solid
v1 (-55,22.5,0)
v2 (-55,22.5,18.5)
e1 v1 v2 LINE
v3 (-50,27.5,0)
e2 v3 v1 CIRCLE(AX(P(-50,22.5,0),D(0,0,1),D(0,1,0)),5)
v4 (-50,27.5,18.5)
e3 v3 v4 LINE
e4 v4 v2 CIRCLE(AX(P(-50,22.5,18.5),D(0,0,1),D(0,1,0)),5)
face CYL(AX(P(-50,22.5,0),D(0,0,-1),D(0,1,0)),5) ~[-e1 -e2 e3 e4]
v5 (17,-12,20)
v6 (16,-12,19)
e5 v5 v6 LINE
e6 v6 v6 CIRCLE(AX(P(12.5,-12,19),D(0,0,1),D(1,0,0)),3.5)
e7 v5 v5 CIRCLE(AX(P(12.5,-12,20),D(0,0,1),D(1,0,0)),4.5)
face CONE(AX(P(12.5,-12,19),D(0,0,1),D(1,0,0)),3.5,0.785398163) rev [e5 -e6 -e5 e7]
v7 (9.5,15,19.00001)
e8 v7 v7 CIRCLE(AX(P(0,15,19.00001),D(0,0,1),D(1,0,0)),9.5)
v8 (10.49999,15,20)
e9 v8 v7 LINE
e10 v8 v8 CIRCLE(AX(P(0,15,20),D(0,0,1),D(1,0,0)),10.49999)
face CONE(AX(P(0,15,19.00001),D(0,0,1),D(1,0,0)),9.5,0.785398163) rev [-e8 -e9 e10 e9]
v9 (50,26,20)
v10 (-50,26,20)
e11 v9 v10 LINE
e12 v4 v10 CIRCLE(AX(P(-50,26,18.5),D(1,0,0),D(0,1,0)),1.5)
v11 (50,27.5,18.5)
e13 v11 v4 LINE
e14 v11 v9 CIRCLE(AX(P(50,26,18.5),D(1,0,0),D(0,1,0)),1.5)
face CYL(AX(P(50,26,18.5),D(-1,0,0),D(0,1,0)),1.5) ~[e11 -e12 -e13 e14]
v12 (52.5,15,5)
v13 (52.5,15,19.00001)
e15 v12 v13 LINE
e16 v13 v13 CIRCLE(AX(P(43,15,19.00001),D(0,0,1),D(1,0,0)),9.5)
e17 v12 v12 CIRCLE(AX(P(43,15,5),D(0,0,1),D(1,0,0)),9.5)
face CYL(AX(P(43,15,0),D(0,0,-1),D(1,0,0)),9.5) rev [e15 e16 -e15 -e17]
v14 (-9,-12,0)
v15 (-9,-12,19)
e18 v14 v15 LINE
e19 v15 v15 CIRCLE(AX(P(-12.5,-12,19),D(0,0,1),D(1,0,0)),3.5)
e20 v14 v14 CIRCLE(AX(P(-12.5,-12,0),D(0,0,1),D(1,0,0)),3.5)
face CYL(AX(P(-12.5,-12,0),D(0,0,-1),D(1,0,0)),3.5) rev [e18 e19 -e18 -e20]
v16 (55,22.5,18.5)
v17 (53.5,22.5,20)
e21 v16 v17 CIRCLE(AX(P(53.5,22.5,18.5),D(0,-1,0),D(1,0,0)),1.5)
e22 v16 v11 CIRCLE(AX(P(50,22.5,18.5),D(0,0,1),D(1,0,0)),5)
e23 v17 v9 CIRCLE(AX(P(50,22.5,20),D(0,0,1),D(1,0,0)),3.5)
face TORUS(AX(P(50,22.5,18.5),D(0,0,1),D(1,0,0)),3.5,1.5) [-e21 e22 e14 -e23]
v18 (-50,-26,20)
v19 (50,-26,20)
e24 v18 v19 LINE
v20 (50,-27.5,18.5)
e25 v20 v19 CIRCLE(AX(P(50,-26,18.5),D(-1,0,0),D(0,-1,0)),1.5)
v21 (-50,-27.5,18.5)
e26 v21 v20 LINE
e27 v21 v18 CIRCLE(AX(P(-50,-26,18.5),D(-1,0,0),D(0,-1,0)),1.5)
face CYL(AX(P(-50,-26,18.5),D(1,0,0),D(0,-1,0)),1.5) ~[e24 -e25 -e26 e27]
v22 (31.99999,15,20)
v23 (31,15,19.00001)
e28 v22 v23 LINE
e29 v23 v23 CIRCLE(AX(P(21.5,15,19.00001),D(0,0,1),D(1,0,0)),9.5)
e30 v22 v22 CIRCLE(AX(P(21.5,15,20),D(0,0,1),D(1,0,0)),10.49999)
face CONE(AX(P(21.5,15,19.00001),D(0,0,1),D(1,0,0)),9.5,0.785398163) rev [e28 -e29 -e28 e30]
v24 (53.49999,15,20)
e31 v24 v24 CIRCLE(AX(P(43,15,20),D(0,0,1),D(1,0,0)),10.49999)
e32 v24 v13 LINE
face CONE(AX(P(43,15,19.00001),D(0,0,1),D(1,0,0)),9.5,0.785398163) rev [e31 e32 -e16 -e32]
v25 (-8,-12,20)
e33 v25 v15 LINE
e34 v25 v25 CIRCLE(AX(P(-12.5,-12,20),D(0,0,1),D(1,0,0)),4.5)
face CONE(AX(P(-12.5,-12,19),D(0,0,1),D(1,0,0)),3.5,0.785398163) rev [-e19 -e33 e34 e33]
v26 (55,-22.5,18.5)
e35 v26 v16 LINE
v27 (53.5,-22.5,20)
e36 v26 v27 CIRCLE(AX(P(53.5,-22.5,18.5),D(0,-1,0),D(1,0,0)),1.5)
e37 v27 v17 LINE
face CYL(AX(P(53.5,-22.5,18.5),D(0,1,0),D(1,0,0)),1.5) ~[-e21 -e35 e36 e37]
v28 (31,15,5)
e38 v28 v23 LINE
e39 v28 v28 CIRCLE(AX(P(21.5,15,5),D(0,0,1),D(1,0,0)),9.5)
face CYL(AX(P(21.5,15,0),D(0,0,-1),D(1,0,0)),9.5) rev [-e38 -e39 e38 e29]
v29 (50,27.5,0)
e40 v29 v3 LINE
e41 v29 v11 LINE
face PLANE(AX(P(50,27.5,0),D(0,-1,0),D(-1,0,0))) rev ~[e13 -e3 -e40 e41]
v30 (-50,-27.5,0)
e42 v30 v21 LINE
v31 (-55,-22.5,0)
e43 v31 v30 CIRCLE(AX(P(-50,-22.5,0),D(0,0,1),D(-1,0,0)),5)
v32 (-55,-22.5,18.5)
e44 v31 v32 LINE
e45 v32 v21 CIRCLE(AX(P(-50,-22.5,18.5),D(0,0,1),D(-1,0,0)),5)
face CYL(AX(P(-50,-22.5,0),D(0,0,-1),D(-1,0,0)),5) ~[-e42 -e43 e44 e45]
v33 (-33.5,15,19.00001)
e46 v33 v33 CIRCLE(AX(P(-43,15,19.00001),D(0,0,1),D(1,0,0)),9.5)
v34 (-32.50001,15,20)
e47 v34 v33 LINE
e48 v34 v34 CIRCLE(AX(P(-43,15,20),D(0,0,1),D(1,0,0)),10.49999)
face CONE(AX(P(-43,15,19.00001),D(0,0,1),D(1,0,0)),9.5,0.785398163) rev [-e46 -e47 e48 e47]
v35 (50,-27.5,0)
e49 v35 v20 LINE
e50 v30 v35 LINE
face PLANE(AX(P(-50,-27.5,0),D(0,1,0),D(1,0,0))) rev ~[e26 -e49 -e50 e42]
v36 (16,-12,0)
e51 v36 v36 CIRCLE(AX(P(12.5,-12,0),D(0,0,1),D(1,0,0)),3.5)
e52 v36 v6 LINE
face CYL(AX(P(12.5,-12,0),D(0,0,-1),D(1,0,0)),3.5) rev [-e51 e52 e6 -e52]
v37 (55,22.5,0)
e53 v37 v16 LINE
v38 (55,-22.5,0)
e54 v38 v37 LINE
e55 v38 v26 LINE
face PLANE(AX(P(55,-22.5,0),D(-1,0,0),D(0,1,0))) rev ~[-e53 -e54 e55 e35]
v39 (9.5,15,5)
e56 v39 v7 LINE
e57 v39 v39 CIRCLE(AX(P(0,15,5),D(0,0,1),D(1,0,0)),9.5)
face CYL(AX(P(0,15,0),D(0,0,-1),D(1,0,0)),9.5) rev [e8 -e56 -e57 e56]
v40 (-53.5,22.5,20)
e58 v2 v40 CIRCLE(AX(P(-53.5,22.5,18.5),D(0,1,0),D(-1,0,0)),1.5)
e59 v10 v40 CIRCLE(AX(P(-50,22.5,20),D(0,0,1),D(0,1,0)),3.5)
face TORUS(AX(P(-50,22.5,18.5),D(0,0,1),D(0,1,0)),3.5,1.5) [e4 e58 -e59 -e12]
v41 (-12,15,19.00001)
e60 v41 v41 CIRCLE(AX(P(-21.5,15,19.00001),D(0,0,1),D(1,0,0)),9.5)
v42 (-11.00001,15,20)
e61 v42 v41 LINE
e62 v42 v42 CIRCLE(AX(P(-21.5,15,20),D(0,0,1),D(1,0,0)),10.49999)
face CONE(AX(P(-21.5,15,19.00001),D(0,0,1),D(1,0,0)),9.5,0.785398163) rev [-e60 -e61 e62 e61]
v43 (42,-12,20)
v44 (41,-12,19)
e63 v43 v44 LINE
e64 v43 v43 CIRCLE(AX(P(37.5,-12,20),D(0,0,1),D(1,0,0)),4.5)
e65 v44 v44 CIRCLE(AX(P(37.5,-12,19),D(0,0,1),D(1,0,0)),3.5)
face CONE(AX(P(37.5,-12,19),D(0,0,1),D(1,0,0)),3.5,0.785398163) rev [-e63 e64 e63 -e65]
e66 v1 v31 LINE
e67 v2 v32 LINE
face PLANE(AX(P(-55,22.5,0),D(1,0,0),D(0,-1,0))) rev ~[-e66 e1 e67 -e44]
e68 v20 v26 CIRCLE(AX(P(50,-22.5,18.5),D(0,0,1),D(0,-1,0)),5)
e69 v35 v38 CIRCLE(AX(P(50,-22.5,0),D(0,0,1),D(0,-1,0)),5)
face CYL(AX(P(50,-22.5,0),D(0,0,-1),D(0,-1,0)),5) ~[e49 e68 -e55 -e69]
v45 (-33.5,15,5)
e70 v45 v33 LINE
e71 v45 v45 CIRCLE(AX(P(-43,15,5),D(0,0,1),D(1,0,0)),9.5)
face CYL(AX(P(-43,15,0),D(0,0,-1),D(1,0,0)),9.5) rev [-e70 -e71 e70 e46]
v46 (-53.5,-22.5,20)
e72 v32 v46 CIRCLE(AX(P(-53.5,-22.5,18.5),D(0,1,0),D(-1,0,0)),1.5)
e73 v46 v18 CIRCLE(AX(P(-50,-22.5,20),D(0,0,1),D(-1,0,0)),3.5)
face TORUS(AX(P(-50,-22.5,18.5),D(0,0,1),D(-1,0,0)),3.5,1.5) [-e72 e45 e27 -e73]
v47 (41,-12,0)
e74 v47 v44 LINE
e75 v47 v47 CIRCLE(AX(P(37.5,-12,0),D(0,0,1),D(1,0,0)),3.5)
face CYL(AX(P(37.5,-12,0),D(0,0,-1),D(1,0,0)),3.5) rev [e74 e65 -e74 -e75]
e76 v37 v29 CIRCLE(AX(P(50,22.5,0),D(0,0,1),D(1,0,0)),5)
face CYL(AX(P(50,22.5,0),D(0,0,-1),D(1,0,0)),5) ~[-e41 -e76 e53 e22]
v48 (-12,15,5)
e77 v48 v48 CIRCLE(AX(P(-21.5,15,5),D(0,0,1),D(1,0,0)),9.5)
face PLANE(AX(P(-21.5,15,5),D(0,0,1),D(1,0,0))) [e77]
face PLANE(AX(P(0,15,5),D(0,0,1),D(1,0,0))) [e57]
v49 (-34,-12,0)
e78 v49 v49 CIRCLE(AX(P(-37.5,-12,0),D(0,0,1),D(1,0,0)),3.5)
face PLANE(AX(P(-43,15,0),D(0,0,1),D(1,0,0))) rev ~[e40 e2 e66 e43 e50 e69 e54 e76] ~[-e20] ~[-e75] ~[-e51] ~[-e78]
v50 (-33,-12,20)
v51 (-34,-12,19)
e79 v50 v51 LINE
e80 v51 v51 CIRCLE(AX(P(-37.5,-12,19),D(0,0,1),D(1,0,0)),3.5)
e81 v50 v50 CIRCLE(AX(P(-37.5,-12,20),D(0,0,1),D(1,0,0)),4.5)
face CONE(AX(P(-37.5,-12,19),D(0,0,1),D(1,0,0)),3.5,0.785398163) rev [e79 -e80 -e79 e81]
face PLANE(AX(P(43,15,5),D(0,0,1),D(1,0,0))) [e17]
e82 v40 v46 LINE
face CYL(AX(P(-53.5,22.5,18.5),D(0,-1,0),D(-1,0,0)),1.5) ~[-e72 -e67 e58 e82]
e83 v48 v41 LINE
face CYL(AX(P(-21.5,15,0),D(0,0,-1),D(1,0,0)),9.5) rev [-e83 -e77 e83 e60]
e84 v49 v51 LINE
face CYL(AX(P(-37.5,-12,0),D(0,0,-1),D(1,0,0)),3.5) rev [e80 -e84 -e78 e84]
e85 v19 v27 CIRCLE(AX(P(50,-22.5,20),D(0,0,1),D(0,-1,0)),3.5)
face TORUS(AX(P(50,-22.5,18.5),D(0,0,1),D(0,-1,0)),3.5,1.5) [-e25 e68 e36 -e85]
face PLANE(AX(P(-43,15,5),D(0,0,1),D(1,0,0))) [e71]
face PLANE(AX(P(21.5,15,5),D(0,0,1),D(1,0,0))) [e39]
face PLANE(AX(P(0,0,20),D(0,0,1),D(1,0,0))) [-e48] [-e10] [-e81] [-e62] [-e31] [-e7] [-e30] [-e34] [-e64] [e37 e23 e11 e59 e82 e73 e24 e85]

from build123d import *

# Parameters (mm, degrees)
F0_R     = 12.5
F0_R_2   = 9.5
F0_R_3   = 3.5
F1_DEPTH = 20
F2_DEPTH = 5
F3_R     = 1.5
F4_SIZE  = 0.99999
F5_SIZE  = 1


# Not quite as in the source:
# - a fillet or chamfer is up to 0.001 mm smaller than in the source, because OpenCascade refuses the exact size


with BuildPart() as f1:
    # F0 (on Top) → F1 (new body)
    with BuildSketch(Plane.XY):
        with BuildLine():
            Line((50, 27.5), (-50, 27.5))
            ThreePointArc((-50, 27.5), (-53.5355339059, 26.0355339059), (-55, 22.5))
            Line((-55, 22.5), (-55, -22.5))
            ThreePointArc((-55, -22.5), (-53.5355339059, -26.0355339059), (-50, -27.5))
            Line((-50, -27.5), (50, -27.5))
            ThreePointArc((50, -27.5), (53.5355339059, -26.0355339059), (55, -22.5))
            Line((55, -22.5), (55, 22.5))
            ThreePointArc((55, 22.5), (53.5355339059, 26.0355339059), (50, 27.5))
        make_face()
        with Locations((-37.5, -12)):
            Circle(F0_R, mode=Mode.SUBTRACT)
        with BuildLine():
            ThreePointArc((0, -12), (-12.5, -24.5), (-25, -12))
            ThreePointArc((-25, -12), (-12.5, 0.5), (0, -12))
        make_face(mode=Mode.SUBTRACT)
        with BuildLine():
            ThreePointArc((25, -12), (12.5, -24.5), (0, -12))
            ThreePointArc((0, -12), (12.5, 0.5), (25, -12))
        make_face(mode=Mode.SUBTRACT)
        with BuildLine():
            ThreePointArc((50, -12), (37.5, -24.5), (25, -12))
            ThreePointArc((25, -12), (37.5, 0.5), (50, -12))
        make_face(mode=Mode.SUBTRACT)
        with Locations((-43, 15)):
            Circle(F0_R_2, mode=Mode.SUBTRACT)
        with Locations((-21.5, 15)):
            Circle(F0_R_2, mode=Mode.SUBTRACT)
        with Locations((0, 15)):
            Circle(F0_R_2, mode=Mode.SUBTRACT)
        with Locations((21.5, 15)):
            Circle(F0_R_2, mode=Mode.SUBTRACT)
        with Locations((43, 15)):
            Circle(F0_R_2, mode=Mode.SUBTRACT)
        with BuildLine():
            ThreePointArc((0, -12), (-12.5, 0.5), (-25, -12))
            ThreePointArc((-25, -12), (-12.5, -24.5), (0, -12))
        make_face()
        with Locations((-12.5, -12)):
            Circle(F0_R_3, mode=Mode.SUBTRACT)
        with Locations((-37.5, -12)):
            Circle(F0_R)
        with Locations((-37.5, -12)):
            Circle(F0_R_3, mode=Mode.SUBTRACT)
        with BuildLine():
            ThreePointArc((25, -12), (12.5, 0.5), (0, -12))
            ThreePointArc((0, -12), (12.5, -24.5), (25, -12))
        make_face()
        with Locations((12.5, -12)):
            Circle(F0_R_3, mode=Mode.SUBTRACT)
        with BuildLine():
            ThreePointArc((50, -12), (37.5, 0.5), (25, -12))
            ThreePointArc((25, -12), (37.5, -24.5), (50, -12))
        make_face()
        with Locations((37.5, -12)):
            Circle(F0_R_3, mode=Mode.SUBTRACT)
    extrude(amount=F1_DEPTH)

    # F0 (on Top) → F2 (join)
    with BuildSketch(Plane.XY):
        with Locations((-43, 15)):
            Circle(F0_R_2)
        with Locations((-21.5, 15)):
            Circle(F0_R_2)
        with Locations((0, 15)):
            Circle(F0_R_2)
        with Locations((21.5, 15)):
            Circle(F0_R_2)
        with Locations((43, 15)):
            Circle(F0_R_2)
    extrude(amount=F2_DEPTH)

    # F3
    f3_edges = [f1.edges().sort_by_distance(p)[0] for p in [
        (0, -27.5, 20),
    ]]
    fillet(f3_edges, radius=F3_R)

    # F4 (size 1 in the source; OpenCascade refuses exactly that, so slightly less here)
    f4_edges = [f1.edges().sort_by_distance(p)[0] for p in [
        (-52.5, 15, 20),
        (-31, 15, 20),
        (-9.5, 15, 20),
        (12, 15, 20),
        (33.5, 15, 20),
    ]]
    chamfer(f4_edges, length=F4_SIZE)

    # F5
    f5_edges = [f1.edges().sort_by_distance(p)[0] for p in [
        (-41, -12, 20),
        (-16, -12, 20),
        (9, -12, 20),
        (34, -12, 20),
    ]]
    chamfer(f5_edges, length=F5_SIZE)


solid = f1.part
